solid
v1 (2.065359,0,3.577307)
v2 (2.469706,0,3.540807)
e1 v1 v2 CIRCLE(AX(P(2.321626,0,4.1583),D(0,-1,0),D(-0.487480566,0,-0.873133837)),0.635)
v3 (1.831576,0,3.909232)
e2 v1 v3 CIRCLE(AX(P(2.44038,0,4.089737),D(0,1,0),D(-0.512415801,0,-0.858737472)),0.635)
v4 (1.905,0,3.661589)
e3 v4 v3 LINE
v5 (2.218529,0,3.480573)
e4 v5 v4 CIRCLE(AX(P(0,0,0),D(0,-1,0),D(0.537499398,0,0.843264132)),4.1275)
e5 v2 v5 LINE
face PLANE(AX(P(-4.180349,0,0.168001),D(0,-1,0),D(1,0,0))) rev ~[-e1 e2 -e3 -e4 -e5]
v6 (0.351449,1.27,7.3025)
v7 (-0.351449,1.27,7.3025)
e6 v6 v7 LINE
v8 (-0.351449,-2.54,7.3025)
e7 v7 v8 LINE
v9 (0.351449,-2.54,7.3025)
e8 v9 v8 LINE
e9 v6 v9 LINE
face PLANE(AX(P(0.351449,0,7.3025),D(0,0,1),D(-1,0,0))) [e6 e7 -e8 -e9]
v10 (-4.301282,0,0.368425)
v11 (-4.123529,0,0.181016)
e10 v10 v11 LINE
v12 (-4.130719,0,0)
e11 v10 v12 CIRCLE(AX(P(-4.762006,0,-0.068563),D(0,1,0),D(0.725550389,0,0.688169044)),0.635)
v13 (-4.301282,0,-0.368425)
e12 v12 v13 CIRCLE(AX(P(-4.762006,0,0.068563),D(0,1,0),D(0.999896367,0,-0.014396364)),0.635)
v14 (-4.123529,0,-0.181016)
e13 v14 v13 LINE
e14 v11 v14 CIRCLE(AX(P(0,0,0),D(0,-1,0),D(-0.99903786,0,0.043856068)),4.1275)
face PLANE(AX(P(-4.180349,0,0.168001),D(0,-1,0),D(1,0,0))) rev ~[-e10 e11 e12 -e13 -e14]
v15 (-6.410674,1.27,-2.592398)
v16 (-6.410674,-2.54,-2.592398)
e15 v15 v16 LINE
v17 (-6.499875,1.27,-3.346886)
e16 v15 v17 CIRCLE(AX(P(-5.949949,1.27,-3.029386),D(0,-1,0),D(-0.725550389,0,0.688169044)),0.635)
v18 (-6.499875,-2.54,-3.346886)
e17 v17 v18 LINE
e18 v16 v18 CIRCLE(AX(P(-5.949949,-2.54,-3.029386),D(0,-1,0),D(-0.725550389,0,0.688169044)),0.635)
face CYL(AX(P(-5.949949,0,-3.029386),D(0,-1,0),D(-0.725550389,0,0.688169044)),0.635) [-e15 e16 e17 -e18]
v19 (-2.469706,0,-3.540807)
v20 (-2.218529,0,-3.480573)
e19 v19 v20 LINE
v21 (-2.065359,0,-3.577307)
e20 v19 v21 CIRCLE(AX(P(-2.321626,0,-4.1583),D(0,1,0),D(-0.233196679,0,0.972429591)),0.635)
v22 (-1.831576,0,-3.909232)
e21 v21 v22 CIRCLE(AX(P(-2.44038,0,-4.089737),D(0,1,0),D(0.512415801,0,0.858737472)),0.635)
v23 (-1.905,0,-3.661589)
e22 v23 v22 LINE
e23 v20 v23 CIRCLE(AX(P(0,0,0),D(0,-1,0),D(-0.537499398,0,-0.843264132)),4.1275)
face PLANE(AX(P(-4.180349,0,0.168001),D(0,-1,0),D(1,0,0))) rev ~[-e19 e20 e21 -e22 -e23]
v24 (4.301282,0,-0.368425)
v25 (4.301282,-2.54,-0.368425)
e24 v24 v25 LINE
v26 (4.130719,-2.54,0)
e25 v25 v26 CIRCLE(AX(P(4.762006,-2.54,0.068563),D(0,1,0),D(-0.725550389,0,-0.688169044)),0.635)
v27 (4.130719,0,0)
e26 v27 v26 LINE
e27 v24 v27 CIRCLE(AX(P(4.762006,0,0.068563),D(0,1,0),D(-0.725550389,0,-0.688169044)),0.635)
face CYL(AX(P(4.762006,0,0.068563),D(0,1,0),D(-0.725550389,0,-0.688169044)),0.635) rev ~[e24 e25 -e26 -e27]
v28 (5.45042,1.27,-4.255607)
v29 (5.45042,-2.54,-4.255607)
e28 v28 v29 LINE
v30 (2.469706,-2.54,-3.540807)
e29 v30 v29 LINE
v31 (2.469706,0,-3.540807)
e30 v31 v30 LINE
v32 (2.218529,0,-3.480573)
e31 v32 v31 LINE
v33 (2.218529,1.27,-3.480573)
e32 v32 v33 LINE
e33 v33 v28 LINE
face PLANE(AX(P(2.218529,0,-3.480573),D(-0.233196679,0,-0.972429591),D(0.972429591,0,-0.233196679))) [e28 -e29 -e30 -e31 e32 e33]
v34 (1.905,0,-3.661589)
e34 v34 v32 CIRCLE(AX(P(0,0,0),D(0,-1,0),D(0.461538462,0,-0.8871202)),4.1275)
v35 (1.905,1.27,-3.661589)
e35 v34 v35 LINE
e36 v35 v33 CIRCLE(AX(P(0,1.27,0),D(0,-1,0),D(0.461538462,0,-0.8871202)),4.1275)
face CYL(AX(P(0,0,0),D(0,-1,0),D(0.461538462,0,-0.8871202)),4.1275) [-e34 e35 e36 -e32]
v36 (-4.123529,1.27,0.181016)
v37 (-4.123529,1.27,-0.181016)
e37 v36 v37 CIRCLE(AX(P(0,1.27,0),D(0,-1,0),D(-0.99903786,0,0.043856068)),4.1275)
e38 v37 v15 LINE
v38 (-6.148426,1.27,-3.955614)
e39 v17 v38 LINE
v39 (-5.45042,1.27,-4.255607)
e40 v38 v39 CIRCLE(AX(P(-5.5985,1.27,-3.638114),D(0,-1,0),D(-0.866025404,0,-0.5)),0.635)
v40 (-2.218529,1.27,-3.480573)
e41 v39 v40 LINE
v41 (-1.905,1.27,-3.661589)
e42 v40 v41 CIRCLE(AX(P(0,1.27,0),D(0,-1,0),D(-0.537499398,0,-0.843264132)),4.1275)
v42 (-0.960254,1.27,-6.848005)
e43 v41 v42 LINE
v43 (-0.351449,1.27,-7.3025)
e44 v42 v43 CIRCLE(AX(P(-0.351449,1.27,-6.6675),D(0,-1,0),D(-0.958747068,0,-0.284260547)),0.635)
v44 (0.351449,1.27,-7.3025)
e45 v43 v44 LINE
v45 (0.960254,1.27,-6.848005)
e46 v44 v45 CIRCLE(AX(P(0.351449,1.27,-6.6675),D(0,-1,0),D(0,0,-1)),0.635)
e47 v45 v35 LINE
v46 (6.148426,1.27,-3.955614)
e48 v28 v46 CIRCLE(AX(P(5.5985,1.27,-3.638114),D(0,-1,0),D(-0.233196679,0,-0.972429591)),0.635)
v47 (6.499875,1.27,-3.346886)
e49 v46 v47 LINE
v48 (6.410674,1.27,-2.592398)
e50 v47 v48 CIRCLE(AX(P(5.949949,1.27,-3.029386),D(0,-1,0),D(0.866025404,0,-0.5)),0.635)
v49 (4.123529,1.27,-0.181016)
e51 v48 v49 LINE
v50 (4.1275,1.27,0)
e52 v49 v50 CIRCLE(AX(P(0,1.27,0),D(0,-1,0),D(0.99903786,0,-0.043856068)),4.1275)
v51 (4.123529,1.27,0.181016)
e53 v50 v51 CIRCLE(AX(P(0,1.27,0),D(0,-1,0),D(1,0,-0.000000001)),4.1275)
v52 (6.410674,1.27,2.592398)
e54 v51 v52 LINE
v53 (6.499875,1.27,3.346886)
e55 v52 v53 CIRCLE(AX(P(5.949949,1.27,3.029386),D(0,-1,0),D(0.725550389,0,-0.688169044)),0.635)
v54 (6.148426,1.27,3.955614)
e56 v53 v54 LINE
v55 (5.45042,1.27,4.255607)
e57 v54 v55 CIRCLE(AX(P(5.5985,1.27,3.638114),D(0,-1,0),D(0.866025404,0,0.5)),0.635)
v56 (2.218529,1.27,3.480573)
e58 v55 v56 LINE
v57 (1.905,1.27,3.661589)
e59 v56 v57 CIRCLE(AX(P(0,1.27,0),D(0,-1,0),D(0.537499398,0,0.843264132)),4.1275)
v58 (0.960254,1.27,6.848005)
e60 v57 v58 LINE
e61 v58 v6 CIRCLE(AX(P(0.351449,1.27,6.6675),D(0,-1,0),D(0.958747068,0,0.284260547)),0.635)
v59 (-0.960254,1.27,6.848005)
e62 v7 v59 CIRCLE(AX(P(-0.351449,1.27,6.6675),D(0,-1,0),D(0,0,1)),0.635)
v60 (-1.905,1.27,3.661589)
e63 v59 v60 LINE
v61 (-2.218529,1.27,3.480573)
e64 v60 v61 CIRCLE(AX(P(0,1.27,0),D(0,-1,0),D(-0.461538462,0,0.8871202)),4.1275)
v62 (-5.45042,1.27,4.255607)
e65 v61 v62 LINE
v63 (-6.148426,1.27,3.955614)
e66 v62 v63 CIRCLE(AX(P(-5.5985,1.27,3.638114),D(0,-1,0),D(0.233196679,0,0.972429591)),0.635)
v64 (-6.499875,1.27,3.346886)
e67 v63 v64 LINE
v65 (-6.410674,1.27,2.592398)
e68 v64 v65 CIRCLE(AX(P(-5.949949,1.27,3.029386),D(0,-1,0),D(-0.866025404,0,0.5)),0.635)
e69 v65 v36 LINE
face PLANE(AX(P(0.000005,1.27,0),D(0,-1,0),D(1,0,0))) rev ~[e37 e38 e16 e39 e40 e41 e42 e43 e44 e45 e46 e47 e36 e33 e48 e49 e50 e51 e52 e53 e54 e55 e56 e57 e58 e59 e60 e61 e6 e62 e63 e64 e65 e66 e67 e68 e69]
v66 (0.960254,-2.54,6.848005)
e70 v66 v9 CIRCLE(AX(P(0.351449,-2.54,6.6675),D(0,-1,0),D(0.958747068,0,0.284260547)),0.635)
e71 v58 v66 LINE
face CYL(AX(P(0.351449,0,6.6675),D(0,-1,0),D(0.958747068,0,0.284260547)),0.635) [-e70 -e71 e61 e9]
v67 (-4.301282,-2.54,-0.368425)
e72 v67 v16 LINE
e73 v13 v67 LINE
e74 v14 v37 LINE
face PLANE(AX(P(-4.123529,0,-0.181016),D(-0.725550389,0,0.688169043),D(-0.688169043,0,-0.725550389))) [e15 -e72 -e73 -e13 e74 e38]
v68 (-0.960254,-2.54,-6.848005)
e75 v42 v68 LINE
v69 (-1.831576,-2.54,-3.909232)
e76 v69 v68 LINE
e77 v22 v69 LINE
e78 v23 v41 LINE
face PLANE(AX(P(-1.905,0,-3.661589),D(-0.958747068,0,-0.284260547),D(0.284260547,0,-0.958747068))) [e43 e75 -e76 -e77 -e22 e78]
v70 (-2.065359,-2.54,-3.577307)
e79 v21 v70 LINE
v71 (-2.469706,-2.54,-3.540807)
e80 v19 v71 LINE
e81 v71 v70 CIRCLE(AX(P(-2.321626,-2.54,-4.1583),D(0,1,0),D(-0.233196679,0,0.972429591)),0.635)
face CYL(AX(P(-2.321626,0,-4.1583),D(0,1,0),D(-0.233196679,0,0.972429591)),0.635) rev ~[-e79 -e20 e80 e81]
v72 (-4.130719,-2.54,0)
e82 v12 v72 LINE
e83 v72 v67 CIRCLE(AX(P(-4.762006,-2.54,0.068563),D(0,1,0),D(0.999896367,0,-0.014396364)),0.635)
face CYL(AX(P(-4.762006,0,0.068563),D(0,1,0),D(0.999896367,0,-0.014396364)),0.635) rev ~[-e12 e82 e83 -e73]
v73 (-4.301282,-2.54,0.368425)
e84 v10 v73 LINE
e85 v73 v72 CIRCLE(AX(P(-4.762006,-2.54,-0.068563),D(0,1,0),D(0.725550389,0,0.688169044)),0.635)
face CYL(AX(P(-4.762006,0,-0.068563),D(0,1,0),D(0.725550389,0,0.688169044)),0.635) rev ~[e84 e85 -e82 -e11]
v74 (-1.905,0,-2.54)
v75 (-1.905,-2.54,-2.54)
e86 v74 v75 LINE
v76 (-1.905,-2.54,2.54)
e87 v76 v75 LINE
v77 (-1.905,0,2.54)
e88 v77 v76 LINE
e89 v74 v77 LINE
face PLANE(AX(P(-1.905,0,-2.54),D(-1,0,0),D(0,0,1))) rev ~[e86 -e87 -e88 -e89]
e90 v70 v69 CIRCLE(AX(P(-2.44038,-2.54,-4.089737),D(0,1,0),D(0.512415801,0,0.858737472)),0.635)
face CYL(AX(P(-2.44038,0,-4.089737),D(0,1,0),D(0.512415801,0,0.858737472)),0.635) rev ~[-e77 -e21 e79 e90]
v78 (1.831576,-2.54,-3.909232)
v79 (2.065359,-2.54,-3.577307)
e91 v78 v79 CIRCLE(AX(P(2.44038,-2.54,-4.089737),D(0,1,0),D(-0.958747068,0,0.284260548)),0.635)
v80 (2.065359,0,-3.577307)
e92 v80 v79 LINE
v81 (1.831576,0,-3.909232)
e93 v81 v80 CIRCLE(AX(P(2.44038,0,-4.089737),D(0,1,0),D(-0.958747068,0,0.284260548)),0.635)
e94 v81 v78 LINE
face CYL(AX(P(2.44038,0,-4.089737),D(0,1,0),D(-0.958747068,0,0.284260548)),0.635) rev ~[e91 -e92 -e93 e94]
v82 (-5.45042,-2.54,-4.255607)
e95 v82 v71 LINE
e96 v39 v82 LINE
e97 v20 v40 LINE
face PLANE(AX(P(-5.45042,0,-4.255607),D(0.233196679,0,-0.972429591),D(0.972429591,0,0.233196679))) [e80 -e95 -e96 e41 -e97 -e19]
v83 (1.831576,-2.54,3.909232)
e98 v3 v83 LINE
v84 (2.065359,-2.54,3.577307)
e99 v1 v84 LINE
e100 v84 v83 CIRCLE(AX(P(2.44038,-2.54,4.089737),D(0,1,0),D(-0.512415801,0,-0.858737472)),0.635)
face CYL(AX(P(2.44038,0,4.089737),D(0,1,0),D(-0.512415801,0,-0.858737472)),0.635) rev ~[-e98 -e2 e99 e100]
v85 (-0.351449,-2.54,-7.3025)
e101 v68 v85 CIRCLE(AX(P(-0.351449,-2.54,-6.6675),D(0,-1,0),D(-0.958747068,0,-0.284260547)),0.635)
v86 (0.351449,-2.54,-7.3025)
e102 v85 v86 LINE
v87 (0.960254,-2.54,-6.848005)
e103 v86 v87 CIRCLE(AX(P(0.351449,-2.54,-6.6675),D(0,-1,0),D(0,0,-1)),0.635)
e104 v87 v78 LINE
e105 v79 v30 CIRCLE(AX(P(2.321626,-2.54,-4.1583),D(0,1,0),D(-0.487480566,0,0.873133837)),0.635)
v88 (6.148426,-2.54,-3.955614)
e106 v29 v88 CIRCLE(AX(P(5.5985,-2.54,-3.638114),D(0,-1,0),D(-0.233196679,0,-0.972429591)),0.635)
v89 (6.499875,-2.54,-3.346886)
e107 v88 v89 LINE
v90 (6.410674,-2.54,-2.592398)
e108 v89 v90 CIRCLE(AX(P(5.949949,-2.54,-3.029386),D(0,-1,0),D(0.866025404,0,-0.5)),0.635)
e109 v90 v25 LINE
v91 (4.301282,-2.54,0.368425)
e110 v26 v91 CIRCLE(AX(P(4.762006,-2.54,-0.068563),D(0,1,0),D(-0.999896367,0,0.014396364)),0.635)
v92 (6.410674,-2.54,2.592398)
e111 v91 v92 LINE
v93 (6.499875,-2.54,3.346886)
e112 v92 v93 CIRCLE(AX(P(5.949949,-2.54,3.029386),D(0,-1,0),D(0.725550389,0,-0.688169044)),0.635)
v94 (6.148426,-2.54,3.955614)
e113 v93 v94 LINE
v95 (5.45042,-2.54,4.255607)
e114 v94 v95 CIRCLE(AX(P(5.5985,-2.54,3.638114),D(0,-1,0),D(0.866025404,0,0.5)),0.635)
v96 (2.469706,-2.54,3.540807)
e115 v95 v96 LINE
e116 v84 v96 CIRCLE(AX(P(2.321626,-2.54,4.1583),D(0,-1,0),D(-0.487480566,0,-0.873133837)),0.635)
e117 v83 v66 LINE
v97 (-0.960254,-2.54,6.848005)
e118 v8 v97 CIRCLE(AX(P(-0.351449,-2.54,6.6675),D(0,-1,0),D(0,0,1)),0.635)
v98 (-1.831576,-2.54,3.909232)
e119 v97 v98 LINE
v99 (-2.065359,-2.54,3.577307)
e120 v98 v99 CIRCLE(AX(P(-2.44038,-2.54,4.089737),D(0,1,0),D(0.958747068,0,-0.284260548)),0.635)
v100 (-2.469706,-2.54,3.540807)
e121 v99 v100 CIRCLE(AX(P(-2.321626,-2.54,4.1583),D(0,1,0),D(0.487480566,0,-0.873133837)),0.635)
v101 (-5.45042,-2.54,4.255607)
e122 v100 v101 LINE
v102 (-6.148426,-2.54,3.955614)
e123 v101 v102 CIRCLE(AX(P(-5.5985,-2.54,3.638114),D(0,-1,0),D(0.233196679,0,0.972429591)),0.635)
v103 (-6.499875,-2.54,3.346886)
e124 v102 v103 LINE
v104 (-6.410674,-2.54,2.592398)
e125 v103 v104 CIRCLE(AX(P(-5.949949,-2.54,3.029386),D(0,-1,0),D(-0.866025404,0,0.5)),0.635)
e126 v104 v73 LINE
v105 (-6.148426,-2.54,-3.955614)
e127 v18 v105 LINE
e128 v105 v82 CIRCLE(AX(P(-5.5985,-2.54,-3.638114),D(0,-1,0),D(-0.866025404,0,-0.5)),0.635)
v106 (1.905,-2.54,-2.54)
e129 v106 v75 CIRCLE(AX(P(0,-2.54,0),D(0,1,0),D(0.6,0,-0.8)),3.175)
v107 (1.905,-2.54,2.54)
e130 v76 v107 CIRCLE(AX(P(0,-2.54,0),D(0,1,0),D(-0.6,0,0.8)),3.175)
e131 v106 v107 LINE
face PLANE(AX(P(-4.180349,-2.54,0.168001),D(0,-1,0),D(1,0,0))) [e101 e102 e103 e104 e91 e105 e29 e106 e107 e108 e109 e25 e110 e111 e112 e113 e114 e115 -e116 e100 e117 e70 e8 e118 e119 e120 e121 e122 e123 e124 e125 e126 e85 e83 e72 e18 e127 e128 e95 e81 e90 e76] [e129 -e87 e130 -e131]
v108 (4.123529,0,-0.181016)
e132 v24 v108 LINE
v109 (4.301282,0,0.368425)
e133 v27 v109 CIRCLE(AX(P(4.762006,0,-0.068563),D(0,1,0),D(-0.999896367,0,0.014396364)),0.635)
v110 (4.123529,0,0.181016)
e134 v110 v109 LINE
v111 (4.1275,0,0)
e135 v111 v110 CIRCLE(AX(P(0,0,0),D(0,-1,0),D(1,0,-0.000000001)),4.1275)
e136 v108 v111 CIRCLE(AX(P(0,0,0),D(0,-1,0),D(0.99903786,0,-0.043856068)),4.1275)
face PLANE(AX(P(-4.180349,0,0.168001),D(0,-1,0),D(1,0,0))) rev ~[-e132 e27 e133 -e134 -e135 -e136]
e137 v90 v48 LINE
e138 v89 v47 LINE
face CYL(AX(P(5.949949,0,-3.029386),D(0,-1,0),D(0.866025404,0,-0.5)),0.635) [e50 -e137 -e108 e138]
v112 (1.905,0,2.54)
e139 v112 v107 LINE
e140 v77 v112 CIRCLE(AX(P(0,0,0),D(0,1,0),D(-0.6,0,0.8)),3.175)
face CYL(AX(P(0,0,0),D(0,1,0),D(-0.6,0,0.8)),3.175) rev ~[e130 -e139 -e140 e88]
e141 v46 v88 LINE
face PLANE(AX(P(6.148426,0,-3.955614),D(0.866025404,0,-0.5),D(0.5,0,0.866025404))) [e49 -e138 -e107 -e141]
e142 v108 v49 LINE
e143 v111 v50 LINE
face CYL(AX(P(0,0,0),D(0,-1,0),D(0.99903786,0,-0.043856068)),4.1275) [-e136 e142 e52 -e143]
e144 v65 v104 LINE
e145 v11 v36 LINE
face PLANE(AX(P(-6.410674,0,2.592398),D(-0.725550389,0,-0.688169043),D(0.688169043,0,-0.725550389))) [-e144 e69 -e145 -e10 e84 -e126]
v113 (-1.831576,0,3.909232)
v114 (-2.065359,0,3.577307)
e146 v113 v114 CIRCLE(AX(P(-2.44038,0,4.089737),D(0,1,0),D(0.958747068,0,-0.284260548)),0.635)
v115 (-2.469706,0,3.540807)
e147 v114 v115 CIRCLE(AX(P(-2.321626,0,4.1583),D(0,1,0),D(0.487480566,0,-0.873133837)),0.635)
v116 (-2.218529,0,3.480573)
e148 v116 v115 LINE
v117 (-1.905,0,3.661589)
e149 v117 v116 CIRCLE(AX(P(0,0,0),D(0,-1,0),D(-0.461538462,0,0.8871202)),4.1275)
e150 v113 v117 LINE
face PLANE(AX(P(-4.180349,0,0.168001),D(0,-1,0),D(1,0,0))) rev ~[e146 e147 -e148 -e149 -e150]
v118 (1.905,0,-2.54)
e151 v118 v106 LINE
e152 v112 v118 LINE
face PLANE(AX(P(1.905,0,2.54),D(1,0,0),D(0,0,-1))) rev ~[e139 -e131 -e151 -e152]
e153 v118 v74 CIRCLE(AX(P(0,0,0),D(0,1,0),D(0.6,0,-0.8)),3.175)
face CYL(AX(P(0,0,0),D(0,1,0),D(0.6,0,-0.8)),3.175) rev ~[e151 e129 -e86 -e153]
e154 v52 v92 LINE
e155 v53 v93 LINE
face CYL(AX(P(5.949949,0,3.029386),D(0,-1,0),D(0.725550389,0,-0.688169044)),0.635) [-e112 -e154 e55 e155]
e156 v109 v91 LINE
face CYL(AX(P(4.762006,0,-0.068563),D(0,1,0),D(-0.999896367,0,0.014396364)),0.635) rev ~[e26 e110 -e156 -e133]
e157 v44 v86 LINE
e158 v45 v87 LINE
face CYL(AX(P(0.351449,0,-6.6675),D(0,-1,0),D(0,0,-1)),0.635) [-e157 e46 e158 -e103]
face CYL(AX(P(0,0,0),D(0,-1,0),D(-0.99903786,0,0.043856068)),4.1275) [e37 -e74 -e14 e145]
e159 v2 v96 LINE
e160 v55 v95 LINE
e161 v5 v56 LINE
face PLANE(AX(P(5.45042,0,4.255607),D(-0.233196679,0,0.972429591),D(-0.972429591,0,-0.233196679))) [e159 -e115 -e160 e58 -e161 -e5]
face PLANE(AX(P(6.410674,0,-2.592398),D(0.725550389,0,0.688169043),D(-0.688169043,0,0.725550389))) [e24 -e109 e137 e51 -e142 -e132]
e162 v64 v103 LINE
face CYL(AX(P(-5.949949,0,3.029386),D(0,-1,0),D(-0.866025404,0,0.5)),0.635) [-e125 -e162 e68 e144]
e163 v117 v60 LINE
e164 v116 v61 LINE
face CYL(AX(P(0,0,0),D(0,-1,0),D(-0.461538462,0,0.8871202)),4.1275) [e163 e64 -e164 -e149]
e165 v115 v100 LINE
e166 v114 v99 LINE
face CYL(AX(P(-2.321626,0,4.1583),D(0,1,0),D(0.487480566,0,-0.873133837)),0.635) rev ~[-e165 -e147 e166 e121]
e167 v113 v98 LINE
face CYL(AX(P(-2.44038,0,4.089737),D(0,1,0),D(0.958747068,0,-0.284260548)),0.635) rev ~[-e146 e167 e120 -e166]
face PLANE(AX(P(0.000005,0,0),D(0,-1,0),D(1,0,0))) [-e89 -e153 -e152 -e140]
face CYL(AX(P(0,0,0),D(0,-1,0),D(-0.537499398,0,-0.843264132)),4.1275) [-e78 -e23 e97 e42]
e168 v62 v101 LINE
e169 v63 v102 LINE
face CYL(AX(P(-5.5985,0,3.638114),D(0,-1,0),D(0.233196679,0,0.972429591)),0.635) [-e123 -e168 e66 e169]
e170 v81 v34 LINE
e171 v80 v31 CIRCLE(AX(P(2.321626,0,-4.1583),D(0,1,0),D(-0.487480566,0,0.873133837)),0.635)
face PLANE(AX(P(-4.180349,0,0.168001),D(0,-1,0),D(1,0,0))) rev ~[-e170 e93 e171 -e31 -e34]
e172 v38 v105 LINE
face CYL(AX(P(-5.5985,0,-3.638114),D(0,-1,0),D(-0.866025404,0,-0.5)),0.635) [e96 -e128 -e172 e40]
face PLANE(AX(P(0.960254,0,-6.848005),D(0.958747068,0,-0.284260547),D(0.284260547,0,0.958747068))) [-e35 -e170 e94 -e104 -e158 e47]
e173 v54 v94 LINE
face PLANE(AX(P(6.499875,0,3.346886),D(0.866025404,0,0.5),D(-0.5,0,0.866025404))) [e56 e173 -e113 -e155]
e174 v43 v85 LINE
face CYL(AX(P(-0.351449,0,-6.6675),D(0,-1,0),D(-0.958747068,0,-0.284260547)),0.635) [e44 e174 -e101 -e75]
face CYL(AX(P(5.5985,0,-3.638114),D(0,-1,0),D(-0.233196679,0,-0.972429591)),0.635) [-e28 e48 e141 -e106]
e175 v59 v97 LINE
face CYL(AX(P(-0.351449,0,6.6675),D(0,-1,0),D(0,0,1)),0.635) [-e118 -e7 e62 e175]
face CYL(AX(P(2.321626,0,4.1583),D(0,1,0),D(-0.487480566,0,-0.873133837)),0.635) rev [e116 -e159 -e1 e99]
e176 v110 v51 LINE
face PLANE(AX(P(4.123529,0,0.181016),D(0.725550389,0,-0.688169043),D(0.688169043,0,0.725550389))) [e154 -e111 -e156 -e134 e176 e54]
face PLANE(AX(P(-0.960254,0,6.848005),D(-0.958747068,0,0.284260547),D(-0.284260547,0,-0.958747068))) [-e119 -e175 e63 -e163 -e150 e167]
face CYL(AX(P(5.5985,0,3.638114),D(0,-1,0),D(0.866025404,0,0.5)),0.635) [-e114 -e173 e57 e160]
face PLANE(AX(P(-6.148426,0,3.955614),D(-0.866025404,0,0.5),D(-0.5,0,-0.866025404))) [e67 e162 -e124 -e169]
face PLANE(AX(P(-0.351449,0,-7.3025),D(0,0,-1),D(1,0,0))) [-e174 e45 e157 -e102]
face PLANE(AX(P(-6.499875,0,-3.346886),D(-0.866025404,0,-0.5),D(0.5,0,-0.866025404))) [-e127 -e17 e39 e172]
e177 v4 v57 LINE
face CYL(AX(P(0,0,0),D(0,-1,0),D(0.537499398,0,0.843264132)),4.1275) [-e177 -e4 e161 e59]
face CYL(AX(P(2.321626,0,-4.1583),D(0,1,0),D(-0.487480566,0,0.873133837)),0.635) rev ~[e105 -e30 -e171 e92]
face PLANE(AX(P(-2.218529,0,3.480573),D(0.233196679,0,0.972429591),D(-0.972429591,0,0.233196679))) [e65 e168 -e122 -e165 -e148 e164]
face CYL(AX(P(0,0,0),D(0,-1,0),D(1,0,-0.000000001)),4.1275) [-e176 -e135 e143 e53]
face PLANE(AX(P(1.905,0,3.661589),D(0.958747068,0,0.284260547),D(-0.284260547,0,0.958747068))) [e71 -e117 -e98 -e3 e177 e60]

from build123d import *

# Parameters (mm, degrees)
F1_DEPTH    = 2.54
F2_T1_DEPTH = 2.54
F4_DEPTH    = 25.4
F5_DEPTH    = 1.27


# Not quite as in the source:
# - a fillet or chamfer that OpenCascade refuses, or shapes differently, is made with other operations: its cross-section is extruded or revolved along the edge and cut away or added


with BuildPart() as f1:
    # F0 (on Front) → F1 (new body)
    with BuildSketch(Plane.XZ):
        with BuildLine():
            ThreePointArc((4.1235287664, -0.1810159177), (4.1265070722, -0.090529737), (4.1275, 0))
            ThreePointArc((4.1275, 0), (4.1265070722, 0.090529737), (4.1235287664, 0.1810159177))
            ThreePointArc((4.1235287664, 0.1810159177), (3.5745198541, 2.06375), (2.2185287664, 3.4805727061))
            ThreePointArc((2.2185287664, 3.4805727061), (2.06375, 3.5745198541), (1.905, 3.6615886238))
            ThreePointArc((1.905, 3.6615886238), (0, 4.1275), (-1.905, 3.6615886238))
            ThreePointArc((-1.905, 3.6615886238), (-2.06375, 3.5745198541), (-2.2185287664, 3.4805727061))
            ThreePointArc((-2.2185287664, 3.4805727061), (-3.5745198541, 2.06375), (-4.1235287664, 0.1810159177))
            ThreePointArc((-4.1235287664, 0.1810159177), (-4.1275, 0), (-4.1235287664, -0.1810159177))
            ThreePointArc((-4.1235287664, -0.1810159177), (-3.5745198541, -2.06375), (-2.2185287664, -3.4805727061))
            ThreePointArc((-2.2185287664, -3.4805727061), (-2.06375, -3.5745198541), (-1.905, -3.6615886238))
            ThreePointArc((-1.905, -3.6615886238), (0, -4.1275), (1.905, -3.6615886238))
            ThreePointArc((1.905, -3.6615886238), (2.06375, -3.5745198541), (2.2185287664, -3.4805727061))
            ThreePointArc((2.2185287664, -3.4805727061), (3.5745198541, -2.06375), (4.1235287664, -0.1810159177))
        make_face()
        with BuildLine():
            ThreePointArc((2.2185287664, 3.4805727061), (3.5745198541, 2.06375), (4.1235287664, 0.1810159177))
            Line((4.1235287664, 0.1810159177), (6.4106736138, 2.5923984851))
            ThreePointArc((6.4106736138, 2.5923984851), (6.5805571254, 2.9548302166), (6.4998752479, 3.3468858277))
            Line((6.4998752479, 3.3468858277), (6.1484257743, 3.9556141723))
            ThreePointArc((6.1484257743, 3.9556141723), (5.8492365942, 4.2215145333), (5.4504197518, 4.2556069624))
            Line((5.4504197518, 4.2556069624), (2.2185287664, 3.4805727061))
        make_face()
        with BuildLine():
            Line((6.4106736138, -2.5923984851), (4.1235287664, -0.1810159177))
            ThreePointArc((4.1235287664, -0.1810159177), (3.5745198541, -2.06375), (2.2185287664, -3.4805727061))
            Line((2.2185287664, -3.4805727061), (5.4504197518, -4.2556069624))
            ThreePointArc((5.4504197518, -4.2556069624), (5.8492365942, -4.2215145333), (6.1484257743, -3.9556141723))
            Line((6.1484257743, -3.9556141723), (6.4998752479, -3.3468858277))
            ThreePointArc((6.4998752479, -3.3468858277), (6.5805571254, -2.9548302166), (6.4106736138, -2.5923984851))
        make_face()
        with BuildLine():
            ThreePointArc((-1.905, 3.6615886238), (0, 4.1275), (1.905, 3.6615886238))
            Line((1.905, 3.6615886238), (0.9602538621, 6.8480054475))
            ThreePointArc((0.9602538621, 6.8480054475), (0.7313205312, 7.17634475), (0.3514494736, 7.3025))
            Line((0.3514494736, 7.3025), (-0.3514494736, 7.3025))
            ThreePointArc((-0.3514494736, 7.3025), (-0.7313205312, 7.17634475), (-0.9602538621, 6.8480054475))
            Line((-0.9602538621, 6.8480054475), (-1.905, 3.6615886238))
        make_face()
        with BuildLine():
            Line((0.9602538621, -6.8480054475), (1.905, -3.6615886238))
            ThreePointArc((1.905, -3.6615886238), (0, -4.1275), (-1.905, -3.6615886238))
            Line((-1.905, -3.6615886238), (-0.9602538621, -6.8480054475))
            ThreePointArc((-0.9602538621, -6.8480054475), (-0.7313205312, -7.17634475), (-0.3514494736, -7.3025))
            Line((-0.3514494736, -7.3025), (0.3514494736, -7.3025))
            ThreePointArc((0.3514494736, -7.3025), (0.7313205312, -7.17634475), (0.9602538621, -6.8480054475))
        make_face()
        with BuildLine():
            ThreePointArc((-4.1235287664, 0.1810159177), (-3.5745198541, 2.06375), (-2.2185287664, 3.4805727061))
            Line((-2.2185287664, 3.4805727061), (-5.4504197518, 4.2556069624))
            ThreePointArc((-5.4504197518, 4.2556069624), (-5.8492365942, 4.2215145333), (-6.1484257743, 3.9556141723))
            Line((-6.1484257743, 3.9556141723), (-6.4998752479, 3.3468858277))
            ThreePointArc((-6.4998752479, 3.3468858277), (-6.5805571254, 2.9548302166), (-6.4106736138, 2.5923984851))
            Line((-6.4106736138, 2.5923984851), (-4.1235287664, 0.1810159177))
        make_face()
        with BuildLine():
            Line((-5.4504197518, -4.2556069624), (-2.2185287664, -3.4805727061))
            ThreePointArc((-2.2185287664, -3.4805727061), (-3.5745198541, -2.06375), (-4.1235287664, -0.1810159177))
            Line((-4.1235287664, -0.1810159177), (-6.4106736138, -2.5923984851))
            ThreePointArc((-6.4106736138, -2.5923984851), (-6.5805571254, -2.9548302166), (-6.4998752479, -3.3468858277))
            Line((-6.4998752479, -3.3468858277), (-6.1484257743, -3.9556141723))
            ThreePointArc((-6.1484257743, -3.9556141723), (-5.8492365942, -4.2215145333), (-5.4504197518, -4.2556069624))
        make_face()
    extrude(amount=F1_DEPTH)

    # F2: fillet of radius 0.635 on 12 edges, made by hand

    # F2_s2 → F2_t1 (join)
    with BuildSketch(Plane.XZ):
        with BuildLine():
            ThreePointArc((-4.3012819504, 0.3684246555), (-4.1738908411, 0.1709055432), (-4.1270722547, -0.0594209954))
            ThreePointArc((-4.1270722547, -0.0594209954), (-4.1270518266, 0.0608232715), (-4.1235287664, 0.1810159177))
            Line((-4.1235287664, 0.1810159177), (-4.3012819504, 0.3684246555))
        make_face()
        with BuildLine():
            ThreePointArc((-4.1270722547, 0.0594209954), (-4.1738908411, -0.1709055432), (-4.3012819504, -0.3684246555))
            Line((-4.3012819504, -0.3684246555), (-4.1235287664, -0.1810159177))
            ThreePointArc((-4.1235287664, -0.1810159177), (-4.1270518266, -0.0608232715), (-4.1270722547, 0.0594209954))
        make_face()
        with BuildLine():
            ThreePointArc((-1.8315758641, 3.9092317656), (-1.9389368785, 3.7001482727), (-2.1149962189, 3.5444389181))
            ThreePointArc((-2.1149962189, 3.5444389181), (-2.010851415, 3.6045433603), (-1.905, 3.6615886238))
            Line((-1.905, 3.6615886238), (-1.8315758641, 3.9092317656))
        make_face()
        with BuildLine():
            ThreePointArc((4.3012819504, -0.3684246555), (4.1738908411, -0.1709055432), (4.1270722547, 0.0594209954))
            ThreePointArc((4.1270722547, 0.0594209954), (4.1270518266, -0.0608232715), (4.1235287664, -0.1810159177))
            Line((4.1235287664, -0.1810159177), (4.3012819504, -0.3684246555))
        make_face()
        with BuildLine():
            ThreePointArc((2.0120760358, -3.6038599135), (2.2349539626, -3.5292427294), (2.4697060863, -3.5408071101))
            Line((2.4697060863, -3.5408071101), (2.2185287664, -3.4805727061))
            ThreePointArc((2.2185287664, -3.4805727061), (2.1162004116, -3.5437200888), (2.0120760358, -3.6038599135))
        make_face()
        with BuildLine():
            ThreePointArc((1.8315758641, -3.9092317657), (1.9389368785, -3.7001482727), (2.1149962189, -3.5444389181))
            ThreePointArc((2.1149962189, -3.5444389181), (2.010851415, -3.6045433603), (1.905, -3.6615886238))
            Line((1.905, -3.6615886238), (1.8315758641, -3.9092317657))
        make_face()
        with BuildLine():
            ThreePointArc((-2.1149962189, -3.5444389181), (-1.9389368785, -3.7001482727), (-1.8315758641, -3.9092317657))
            Line((-1.8315758641, -3.9092317657), (-1.905, -3.6615886238))
            ThreePointArc((-1.905, -3.6615886238), (-2.010851415, -3.6045433603), (-2.1149962189, -3.5444389181))
        make_face()
        with BuildLine():
            ThreePointArc((-2.4697060863, -3.5408071101), (-2.2349539626, -3.5292427294), (-2.0120760358, -3.6038599135))
            ThreePointArc((-2.0120760358, -3.6038599135), (-2.1162004116, -3.5437200888), (-2.2185287664, -3.4805727061))
            Line((-2.2185287664, -3.4805727061), (-2.4697060863, -3.5408071101))
        make_face()
        with BuildLine():
            ThreePointArc((-2.0120760358, 3.6038599135), (-2.2349539626, 3.5292427294), (-2.4697060863, 3.5408071101))
            Line((-2.4697060863, 3.5408071101), (-2.2185287664, 3.4805727061))
            ThreePointArc((-2.2185287664, 3.4805727061), (-2.1162004116, 3.5437200888), (-2.0120760358, 3.6038599135))
        make_face()
        with BuildLine():
            ThreePointArc((2.1149962189, 3.5444389181), (1.9389368785, 3.7001482727), (1.8315758641, 3.9092317656))
            Line((1.8315758641, 3.9092317656), (1.905, 3.6615886238))
            ThreePointArc((1.905, 3.6615886238), (2.010851415, 3.6045433603), (2.1149962189, 3.5444389181))
        make_face()
        with BuildLine():
            ThreePointArc((2.0120760358, 3.6038599135), (2.2349539626, 3.5292427294), (2.4697060863, 3.5408071101))
            Line((2.4697060863, 3.5408071101), (2.2185287664, 3.4805727061))
            ThreePointArc((2.2185287664, 3.4805727061), (2.1162004116, 3.5437200888), (2.0120760358, 3.6038599135))
        make_face()
        with BuildLine():
            ThreePointArc((4.1270722547, -0.0594209954), (4.1738908411, 0.1709055432), (4.3012819504, 0.3684246555))
            Line((4.3012819504, 0.3684246555), (4.1235287664, 0.1810159177))
            ThreePointArc((4.1235287664, 0.1810159177), (4.1270518266, 0.0608232715), (4.1270722547, -0.0594209954))
        make_face()
    extrude(amount=F2_T1_DEPTH)

    # F3 (on face) → F4 (cut)
    with BuildSketch(Plane(origin=(0, 0, 0), x_dir=(-1, 0, 0), z_dir=(0, 1, 0))):
        with BuildLine():
            Line((-1.905, 2.54), (-1.905, -2.54))
            ThreePointArc((-1.905, -2.54), (0, -3.175), (1.905, -2.54))
            Line((1.905, -2.54), (1.905, 2.54))
            ThreePointArc((1.905, 2.54), (0, 3.175), (-1.905, 2.54))
        make_face()
    extrude(amount=-F4_DEPTH, mode=Mode.SUBTRACT)

    # F0 (on Front) → F5 (join)
    with BuildSketch(Plane.XZ):
        with BuildLine():
            ThreePointArc((4.1235287664, -0.1810159177), (4.1265070722, -0.090529737), (4.1275, 0))
            ThreePointArc((4.1275, 0), (4.1265070722, 0.090529737), (4.1235287664, 0.1810159177))
            ThreePointArc((4.1235287664, 0.1810159177), (3.5745198541, 2.06375), (2.2185287664, 3.4805727061))
            ThreePointArc((2.2185287664, 3.4805727061), (2.06375, 3.5745198541), (1.905, 3.6615886238))
            ThreePointArc((1.905, 3.6615886238), (0, 4.1275), (-1.905, 3.6615886238))
            ThreePointArc((-1.905, 3.6615886238), (-2.06375, 3.5745198541), (-2.2185287664, 3.4805727061))
            ThreePointArc((-2.2185287664, 3.4805727061), (-3.5745198541, 2.06375), (-4.1235287664, 0.1810159177))
            ThreePointArc((-4.1235287664, 0.1810159177), (-4.1275, 0), (-4.1235287664, -0.1810159177))
            ThreePointArc((-4.1235287664, -0.1810159177), (-3.5745198541, -2.06375), (-2.2185287664, -3.4805727061))
            ThreePointArc((-2.2185287664, -3.4805727061), (-2.06375, -3.5745198541), (-1.905, -3.6615886238))
            ThreePointArc((-1.905, -3.6615886238), (0, -4.1275), (1.905, -3.6615886238))
            ThreePointArc((1.905, -3.6615886238), (2.06375, -3.5745198541), (2.2185287664, -3.4805727061))
            ThreePointArc((2.2185287664, -3.4805727061), (3.5745198541, -2.06375), (4.1235287664, -0.1810159177))
        make_face()
        with BuildLine():
            ThreePointArc((2.2185287664, 3.4805727061), (3.5745198541, 2.06375), (4.1235287664, 0.1810159177))
            Line((4.1235287664, 0.1810159177), (6.4106736138, 2.5923984851))
            ThreePointArc((6.4106736138, 2.5923984851), (6.5805571254, 2.9548302166), (6.4998752479, 3.3468858277))
            Line((6.4998752479, 3.3468858277), (6.1484257743, 3.9556141723))
            ThreePointArc((6.1484257743, 3.9556141723), (5.8492365942, 4.2215145333), (5.4504197518, 4.2556069624))
            Line((5.4504197518, 4.2556069624), (2.2185287664, 3.4805727061))
        make_face()
        with BuildLine():
            Line((6.4106736138, -2.5923984851), (4.1235287664, -0.1810159177))
            ThreePointArc((4.1235287664, -0.1810159177), (3.5745198541, -2.06375), (2.2185287664, -3.4805727061))
            Line((2.2185287664, -3.4805727061), (5.4504197518, -4.2556069624))
            ThreePointArc((5.4504197518, -4.2556069624), (5.8492365942, -4.2215145333), (6.1484257743, -3.9556141723))
            Line((6.1484257743, -3.9556141723), (6.4998752479, -3.3468858277))
            ThreePointArc((6.4998752479, -3.3468858277), (6.5805571254, -2.9548302166), (6.4106736138, -2.5923984851))
        make_face()
        with BuildLine():
            ThreePointArc((-1.905, 3.6615886238), (0, 4.1275), (1.905, 3.6615886238))
            Line((1.905, 3.6615886238), (0.9602538621, 6.8480054475))
            ThreePointArc((0.9602538621, 6.8480054475), (0.7313205312, 7.17634475), (0.3514494736, 7.3025))
            Line((0.3514494736, 7.3025), (-0.3514494736, 7.3025))
            ThreePointArc((-0.3514494736, 7.3025), (-0.7313205312, 7.17634475), (-0.9602538621, 6.8480054475))
            Line((-0.9602538621, 6.8480054475), (-1.905, 3.6615886238))
        make_face()
        with BuildLine():
            Line((0.9602538621, -6.8480054475), (1.905, -3.6615886238))
            ThreePointArc((1.905, -3.6615886238), (0, -4.1275), (-1.905, -3.6615886238))
            Line((-1.905, -3.6615886238), (-0.9602538621, -6.8480054475))
            ThreePointArc((-0.9602538621, -6.8480054475), (-0.7313205312, -7.17634475), (-0.3514494736, -7.3025))
            Line((-0.3514494736, -7.3025), (0.3514494736, -7.3025))
            ThreePointArc((0.3514494736, -7.3025), (0.7313205312, -7.17634475), (0.9602538621, -6.8480054475))
        make_face()
        with BuildLine():
            ThreePointArc((-4.1235287664, 0.1810159177), (-3.5745198541, 2.06375), (-2.2185287664, 3.4805727061))
            Line((-2.2185287664, 3.4805727061), (-5.4504197518, 4.2556069624))
            ThreePointArc((-5.4504197518, 4.2556069624), (-5.8492365942, 4.2215145333), (-6.1484257743, 3.9556141723))
            Line((-6.1484257743, 3.9556141723), (-6.4998752479, 3.3468858277))
            ThreePointArc((-6.4998752479, 3.3468858277), (-6.5805571254, 2.9548302166), (-6.4106736138, 2.5923984851))
            Line((-6.4106736138, 2.5923984851), (-4.1235287664, 0.1810159177))
        make_face()
        with BuildLine():
            Line((-5.4504197518, -4.2556069624), (-2.2185287664, -3.4805727061))
            ThreePointArc((-2.2185287664, -3.4805727061), (-3.5745198541, -2.06375), (-4.1235287664, -0.1810159177))
            Line((-4.1235287664, -0.1810159177), (-6.4106736138, -2.5923984851))
            ThreePointArc((-6.4106736138, -2.5923984851), (-6.5805571254, -2.9548302166), (-6.4998752479, -3.3468858277))
            Line((-6.4998752479, -3.3468858277), (-6.1484257743, -3.9556141723))
            ThreePointArc((-6.1484257743, -3.9556141723), (-5.8492365942, -4.2215145333), (-5.4504197518, -4.2556069624))
        make_face()
    extrude(amount=-F5_DEPTH)


solid = f1.part
